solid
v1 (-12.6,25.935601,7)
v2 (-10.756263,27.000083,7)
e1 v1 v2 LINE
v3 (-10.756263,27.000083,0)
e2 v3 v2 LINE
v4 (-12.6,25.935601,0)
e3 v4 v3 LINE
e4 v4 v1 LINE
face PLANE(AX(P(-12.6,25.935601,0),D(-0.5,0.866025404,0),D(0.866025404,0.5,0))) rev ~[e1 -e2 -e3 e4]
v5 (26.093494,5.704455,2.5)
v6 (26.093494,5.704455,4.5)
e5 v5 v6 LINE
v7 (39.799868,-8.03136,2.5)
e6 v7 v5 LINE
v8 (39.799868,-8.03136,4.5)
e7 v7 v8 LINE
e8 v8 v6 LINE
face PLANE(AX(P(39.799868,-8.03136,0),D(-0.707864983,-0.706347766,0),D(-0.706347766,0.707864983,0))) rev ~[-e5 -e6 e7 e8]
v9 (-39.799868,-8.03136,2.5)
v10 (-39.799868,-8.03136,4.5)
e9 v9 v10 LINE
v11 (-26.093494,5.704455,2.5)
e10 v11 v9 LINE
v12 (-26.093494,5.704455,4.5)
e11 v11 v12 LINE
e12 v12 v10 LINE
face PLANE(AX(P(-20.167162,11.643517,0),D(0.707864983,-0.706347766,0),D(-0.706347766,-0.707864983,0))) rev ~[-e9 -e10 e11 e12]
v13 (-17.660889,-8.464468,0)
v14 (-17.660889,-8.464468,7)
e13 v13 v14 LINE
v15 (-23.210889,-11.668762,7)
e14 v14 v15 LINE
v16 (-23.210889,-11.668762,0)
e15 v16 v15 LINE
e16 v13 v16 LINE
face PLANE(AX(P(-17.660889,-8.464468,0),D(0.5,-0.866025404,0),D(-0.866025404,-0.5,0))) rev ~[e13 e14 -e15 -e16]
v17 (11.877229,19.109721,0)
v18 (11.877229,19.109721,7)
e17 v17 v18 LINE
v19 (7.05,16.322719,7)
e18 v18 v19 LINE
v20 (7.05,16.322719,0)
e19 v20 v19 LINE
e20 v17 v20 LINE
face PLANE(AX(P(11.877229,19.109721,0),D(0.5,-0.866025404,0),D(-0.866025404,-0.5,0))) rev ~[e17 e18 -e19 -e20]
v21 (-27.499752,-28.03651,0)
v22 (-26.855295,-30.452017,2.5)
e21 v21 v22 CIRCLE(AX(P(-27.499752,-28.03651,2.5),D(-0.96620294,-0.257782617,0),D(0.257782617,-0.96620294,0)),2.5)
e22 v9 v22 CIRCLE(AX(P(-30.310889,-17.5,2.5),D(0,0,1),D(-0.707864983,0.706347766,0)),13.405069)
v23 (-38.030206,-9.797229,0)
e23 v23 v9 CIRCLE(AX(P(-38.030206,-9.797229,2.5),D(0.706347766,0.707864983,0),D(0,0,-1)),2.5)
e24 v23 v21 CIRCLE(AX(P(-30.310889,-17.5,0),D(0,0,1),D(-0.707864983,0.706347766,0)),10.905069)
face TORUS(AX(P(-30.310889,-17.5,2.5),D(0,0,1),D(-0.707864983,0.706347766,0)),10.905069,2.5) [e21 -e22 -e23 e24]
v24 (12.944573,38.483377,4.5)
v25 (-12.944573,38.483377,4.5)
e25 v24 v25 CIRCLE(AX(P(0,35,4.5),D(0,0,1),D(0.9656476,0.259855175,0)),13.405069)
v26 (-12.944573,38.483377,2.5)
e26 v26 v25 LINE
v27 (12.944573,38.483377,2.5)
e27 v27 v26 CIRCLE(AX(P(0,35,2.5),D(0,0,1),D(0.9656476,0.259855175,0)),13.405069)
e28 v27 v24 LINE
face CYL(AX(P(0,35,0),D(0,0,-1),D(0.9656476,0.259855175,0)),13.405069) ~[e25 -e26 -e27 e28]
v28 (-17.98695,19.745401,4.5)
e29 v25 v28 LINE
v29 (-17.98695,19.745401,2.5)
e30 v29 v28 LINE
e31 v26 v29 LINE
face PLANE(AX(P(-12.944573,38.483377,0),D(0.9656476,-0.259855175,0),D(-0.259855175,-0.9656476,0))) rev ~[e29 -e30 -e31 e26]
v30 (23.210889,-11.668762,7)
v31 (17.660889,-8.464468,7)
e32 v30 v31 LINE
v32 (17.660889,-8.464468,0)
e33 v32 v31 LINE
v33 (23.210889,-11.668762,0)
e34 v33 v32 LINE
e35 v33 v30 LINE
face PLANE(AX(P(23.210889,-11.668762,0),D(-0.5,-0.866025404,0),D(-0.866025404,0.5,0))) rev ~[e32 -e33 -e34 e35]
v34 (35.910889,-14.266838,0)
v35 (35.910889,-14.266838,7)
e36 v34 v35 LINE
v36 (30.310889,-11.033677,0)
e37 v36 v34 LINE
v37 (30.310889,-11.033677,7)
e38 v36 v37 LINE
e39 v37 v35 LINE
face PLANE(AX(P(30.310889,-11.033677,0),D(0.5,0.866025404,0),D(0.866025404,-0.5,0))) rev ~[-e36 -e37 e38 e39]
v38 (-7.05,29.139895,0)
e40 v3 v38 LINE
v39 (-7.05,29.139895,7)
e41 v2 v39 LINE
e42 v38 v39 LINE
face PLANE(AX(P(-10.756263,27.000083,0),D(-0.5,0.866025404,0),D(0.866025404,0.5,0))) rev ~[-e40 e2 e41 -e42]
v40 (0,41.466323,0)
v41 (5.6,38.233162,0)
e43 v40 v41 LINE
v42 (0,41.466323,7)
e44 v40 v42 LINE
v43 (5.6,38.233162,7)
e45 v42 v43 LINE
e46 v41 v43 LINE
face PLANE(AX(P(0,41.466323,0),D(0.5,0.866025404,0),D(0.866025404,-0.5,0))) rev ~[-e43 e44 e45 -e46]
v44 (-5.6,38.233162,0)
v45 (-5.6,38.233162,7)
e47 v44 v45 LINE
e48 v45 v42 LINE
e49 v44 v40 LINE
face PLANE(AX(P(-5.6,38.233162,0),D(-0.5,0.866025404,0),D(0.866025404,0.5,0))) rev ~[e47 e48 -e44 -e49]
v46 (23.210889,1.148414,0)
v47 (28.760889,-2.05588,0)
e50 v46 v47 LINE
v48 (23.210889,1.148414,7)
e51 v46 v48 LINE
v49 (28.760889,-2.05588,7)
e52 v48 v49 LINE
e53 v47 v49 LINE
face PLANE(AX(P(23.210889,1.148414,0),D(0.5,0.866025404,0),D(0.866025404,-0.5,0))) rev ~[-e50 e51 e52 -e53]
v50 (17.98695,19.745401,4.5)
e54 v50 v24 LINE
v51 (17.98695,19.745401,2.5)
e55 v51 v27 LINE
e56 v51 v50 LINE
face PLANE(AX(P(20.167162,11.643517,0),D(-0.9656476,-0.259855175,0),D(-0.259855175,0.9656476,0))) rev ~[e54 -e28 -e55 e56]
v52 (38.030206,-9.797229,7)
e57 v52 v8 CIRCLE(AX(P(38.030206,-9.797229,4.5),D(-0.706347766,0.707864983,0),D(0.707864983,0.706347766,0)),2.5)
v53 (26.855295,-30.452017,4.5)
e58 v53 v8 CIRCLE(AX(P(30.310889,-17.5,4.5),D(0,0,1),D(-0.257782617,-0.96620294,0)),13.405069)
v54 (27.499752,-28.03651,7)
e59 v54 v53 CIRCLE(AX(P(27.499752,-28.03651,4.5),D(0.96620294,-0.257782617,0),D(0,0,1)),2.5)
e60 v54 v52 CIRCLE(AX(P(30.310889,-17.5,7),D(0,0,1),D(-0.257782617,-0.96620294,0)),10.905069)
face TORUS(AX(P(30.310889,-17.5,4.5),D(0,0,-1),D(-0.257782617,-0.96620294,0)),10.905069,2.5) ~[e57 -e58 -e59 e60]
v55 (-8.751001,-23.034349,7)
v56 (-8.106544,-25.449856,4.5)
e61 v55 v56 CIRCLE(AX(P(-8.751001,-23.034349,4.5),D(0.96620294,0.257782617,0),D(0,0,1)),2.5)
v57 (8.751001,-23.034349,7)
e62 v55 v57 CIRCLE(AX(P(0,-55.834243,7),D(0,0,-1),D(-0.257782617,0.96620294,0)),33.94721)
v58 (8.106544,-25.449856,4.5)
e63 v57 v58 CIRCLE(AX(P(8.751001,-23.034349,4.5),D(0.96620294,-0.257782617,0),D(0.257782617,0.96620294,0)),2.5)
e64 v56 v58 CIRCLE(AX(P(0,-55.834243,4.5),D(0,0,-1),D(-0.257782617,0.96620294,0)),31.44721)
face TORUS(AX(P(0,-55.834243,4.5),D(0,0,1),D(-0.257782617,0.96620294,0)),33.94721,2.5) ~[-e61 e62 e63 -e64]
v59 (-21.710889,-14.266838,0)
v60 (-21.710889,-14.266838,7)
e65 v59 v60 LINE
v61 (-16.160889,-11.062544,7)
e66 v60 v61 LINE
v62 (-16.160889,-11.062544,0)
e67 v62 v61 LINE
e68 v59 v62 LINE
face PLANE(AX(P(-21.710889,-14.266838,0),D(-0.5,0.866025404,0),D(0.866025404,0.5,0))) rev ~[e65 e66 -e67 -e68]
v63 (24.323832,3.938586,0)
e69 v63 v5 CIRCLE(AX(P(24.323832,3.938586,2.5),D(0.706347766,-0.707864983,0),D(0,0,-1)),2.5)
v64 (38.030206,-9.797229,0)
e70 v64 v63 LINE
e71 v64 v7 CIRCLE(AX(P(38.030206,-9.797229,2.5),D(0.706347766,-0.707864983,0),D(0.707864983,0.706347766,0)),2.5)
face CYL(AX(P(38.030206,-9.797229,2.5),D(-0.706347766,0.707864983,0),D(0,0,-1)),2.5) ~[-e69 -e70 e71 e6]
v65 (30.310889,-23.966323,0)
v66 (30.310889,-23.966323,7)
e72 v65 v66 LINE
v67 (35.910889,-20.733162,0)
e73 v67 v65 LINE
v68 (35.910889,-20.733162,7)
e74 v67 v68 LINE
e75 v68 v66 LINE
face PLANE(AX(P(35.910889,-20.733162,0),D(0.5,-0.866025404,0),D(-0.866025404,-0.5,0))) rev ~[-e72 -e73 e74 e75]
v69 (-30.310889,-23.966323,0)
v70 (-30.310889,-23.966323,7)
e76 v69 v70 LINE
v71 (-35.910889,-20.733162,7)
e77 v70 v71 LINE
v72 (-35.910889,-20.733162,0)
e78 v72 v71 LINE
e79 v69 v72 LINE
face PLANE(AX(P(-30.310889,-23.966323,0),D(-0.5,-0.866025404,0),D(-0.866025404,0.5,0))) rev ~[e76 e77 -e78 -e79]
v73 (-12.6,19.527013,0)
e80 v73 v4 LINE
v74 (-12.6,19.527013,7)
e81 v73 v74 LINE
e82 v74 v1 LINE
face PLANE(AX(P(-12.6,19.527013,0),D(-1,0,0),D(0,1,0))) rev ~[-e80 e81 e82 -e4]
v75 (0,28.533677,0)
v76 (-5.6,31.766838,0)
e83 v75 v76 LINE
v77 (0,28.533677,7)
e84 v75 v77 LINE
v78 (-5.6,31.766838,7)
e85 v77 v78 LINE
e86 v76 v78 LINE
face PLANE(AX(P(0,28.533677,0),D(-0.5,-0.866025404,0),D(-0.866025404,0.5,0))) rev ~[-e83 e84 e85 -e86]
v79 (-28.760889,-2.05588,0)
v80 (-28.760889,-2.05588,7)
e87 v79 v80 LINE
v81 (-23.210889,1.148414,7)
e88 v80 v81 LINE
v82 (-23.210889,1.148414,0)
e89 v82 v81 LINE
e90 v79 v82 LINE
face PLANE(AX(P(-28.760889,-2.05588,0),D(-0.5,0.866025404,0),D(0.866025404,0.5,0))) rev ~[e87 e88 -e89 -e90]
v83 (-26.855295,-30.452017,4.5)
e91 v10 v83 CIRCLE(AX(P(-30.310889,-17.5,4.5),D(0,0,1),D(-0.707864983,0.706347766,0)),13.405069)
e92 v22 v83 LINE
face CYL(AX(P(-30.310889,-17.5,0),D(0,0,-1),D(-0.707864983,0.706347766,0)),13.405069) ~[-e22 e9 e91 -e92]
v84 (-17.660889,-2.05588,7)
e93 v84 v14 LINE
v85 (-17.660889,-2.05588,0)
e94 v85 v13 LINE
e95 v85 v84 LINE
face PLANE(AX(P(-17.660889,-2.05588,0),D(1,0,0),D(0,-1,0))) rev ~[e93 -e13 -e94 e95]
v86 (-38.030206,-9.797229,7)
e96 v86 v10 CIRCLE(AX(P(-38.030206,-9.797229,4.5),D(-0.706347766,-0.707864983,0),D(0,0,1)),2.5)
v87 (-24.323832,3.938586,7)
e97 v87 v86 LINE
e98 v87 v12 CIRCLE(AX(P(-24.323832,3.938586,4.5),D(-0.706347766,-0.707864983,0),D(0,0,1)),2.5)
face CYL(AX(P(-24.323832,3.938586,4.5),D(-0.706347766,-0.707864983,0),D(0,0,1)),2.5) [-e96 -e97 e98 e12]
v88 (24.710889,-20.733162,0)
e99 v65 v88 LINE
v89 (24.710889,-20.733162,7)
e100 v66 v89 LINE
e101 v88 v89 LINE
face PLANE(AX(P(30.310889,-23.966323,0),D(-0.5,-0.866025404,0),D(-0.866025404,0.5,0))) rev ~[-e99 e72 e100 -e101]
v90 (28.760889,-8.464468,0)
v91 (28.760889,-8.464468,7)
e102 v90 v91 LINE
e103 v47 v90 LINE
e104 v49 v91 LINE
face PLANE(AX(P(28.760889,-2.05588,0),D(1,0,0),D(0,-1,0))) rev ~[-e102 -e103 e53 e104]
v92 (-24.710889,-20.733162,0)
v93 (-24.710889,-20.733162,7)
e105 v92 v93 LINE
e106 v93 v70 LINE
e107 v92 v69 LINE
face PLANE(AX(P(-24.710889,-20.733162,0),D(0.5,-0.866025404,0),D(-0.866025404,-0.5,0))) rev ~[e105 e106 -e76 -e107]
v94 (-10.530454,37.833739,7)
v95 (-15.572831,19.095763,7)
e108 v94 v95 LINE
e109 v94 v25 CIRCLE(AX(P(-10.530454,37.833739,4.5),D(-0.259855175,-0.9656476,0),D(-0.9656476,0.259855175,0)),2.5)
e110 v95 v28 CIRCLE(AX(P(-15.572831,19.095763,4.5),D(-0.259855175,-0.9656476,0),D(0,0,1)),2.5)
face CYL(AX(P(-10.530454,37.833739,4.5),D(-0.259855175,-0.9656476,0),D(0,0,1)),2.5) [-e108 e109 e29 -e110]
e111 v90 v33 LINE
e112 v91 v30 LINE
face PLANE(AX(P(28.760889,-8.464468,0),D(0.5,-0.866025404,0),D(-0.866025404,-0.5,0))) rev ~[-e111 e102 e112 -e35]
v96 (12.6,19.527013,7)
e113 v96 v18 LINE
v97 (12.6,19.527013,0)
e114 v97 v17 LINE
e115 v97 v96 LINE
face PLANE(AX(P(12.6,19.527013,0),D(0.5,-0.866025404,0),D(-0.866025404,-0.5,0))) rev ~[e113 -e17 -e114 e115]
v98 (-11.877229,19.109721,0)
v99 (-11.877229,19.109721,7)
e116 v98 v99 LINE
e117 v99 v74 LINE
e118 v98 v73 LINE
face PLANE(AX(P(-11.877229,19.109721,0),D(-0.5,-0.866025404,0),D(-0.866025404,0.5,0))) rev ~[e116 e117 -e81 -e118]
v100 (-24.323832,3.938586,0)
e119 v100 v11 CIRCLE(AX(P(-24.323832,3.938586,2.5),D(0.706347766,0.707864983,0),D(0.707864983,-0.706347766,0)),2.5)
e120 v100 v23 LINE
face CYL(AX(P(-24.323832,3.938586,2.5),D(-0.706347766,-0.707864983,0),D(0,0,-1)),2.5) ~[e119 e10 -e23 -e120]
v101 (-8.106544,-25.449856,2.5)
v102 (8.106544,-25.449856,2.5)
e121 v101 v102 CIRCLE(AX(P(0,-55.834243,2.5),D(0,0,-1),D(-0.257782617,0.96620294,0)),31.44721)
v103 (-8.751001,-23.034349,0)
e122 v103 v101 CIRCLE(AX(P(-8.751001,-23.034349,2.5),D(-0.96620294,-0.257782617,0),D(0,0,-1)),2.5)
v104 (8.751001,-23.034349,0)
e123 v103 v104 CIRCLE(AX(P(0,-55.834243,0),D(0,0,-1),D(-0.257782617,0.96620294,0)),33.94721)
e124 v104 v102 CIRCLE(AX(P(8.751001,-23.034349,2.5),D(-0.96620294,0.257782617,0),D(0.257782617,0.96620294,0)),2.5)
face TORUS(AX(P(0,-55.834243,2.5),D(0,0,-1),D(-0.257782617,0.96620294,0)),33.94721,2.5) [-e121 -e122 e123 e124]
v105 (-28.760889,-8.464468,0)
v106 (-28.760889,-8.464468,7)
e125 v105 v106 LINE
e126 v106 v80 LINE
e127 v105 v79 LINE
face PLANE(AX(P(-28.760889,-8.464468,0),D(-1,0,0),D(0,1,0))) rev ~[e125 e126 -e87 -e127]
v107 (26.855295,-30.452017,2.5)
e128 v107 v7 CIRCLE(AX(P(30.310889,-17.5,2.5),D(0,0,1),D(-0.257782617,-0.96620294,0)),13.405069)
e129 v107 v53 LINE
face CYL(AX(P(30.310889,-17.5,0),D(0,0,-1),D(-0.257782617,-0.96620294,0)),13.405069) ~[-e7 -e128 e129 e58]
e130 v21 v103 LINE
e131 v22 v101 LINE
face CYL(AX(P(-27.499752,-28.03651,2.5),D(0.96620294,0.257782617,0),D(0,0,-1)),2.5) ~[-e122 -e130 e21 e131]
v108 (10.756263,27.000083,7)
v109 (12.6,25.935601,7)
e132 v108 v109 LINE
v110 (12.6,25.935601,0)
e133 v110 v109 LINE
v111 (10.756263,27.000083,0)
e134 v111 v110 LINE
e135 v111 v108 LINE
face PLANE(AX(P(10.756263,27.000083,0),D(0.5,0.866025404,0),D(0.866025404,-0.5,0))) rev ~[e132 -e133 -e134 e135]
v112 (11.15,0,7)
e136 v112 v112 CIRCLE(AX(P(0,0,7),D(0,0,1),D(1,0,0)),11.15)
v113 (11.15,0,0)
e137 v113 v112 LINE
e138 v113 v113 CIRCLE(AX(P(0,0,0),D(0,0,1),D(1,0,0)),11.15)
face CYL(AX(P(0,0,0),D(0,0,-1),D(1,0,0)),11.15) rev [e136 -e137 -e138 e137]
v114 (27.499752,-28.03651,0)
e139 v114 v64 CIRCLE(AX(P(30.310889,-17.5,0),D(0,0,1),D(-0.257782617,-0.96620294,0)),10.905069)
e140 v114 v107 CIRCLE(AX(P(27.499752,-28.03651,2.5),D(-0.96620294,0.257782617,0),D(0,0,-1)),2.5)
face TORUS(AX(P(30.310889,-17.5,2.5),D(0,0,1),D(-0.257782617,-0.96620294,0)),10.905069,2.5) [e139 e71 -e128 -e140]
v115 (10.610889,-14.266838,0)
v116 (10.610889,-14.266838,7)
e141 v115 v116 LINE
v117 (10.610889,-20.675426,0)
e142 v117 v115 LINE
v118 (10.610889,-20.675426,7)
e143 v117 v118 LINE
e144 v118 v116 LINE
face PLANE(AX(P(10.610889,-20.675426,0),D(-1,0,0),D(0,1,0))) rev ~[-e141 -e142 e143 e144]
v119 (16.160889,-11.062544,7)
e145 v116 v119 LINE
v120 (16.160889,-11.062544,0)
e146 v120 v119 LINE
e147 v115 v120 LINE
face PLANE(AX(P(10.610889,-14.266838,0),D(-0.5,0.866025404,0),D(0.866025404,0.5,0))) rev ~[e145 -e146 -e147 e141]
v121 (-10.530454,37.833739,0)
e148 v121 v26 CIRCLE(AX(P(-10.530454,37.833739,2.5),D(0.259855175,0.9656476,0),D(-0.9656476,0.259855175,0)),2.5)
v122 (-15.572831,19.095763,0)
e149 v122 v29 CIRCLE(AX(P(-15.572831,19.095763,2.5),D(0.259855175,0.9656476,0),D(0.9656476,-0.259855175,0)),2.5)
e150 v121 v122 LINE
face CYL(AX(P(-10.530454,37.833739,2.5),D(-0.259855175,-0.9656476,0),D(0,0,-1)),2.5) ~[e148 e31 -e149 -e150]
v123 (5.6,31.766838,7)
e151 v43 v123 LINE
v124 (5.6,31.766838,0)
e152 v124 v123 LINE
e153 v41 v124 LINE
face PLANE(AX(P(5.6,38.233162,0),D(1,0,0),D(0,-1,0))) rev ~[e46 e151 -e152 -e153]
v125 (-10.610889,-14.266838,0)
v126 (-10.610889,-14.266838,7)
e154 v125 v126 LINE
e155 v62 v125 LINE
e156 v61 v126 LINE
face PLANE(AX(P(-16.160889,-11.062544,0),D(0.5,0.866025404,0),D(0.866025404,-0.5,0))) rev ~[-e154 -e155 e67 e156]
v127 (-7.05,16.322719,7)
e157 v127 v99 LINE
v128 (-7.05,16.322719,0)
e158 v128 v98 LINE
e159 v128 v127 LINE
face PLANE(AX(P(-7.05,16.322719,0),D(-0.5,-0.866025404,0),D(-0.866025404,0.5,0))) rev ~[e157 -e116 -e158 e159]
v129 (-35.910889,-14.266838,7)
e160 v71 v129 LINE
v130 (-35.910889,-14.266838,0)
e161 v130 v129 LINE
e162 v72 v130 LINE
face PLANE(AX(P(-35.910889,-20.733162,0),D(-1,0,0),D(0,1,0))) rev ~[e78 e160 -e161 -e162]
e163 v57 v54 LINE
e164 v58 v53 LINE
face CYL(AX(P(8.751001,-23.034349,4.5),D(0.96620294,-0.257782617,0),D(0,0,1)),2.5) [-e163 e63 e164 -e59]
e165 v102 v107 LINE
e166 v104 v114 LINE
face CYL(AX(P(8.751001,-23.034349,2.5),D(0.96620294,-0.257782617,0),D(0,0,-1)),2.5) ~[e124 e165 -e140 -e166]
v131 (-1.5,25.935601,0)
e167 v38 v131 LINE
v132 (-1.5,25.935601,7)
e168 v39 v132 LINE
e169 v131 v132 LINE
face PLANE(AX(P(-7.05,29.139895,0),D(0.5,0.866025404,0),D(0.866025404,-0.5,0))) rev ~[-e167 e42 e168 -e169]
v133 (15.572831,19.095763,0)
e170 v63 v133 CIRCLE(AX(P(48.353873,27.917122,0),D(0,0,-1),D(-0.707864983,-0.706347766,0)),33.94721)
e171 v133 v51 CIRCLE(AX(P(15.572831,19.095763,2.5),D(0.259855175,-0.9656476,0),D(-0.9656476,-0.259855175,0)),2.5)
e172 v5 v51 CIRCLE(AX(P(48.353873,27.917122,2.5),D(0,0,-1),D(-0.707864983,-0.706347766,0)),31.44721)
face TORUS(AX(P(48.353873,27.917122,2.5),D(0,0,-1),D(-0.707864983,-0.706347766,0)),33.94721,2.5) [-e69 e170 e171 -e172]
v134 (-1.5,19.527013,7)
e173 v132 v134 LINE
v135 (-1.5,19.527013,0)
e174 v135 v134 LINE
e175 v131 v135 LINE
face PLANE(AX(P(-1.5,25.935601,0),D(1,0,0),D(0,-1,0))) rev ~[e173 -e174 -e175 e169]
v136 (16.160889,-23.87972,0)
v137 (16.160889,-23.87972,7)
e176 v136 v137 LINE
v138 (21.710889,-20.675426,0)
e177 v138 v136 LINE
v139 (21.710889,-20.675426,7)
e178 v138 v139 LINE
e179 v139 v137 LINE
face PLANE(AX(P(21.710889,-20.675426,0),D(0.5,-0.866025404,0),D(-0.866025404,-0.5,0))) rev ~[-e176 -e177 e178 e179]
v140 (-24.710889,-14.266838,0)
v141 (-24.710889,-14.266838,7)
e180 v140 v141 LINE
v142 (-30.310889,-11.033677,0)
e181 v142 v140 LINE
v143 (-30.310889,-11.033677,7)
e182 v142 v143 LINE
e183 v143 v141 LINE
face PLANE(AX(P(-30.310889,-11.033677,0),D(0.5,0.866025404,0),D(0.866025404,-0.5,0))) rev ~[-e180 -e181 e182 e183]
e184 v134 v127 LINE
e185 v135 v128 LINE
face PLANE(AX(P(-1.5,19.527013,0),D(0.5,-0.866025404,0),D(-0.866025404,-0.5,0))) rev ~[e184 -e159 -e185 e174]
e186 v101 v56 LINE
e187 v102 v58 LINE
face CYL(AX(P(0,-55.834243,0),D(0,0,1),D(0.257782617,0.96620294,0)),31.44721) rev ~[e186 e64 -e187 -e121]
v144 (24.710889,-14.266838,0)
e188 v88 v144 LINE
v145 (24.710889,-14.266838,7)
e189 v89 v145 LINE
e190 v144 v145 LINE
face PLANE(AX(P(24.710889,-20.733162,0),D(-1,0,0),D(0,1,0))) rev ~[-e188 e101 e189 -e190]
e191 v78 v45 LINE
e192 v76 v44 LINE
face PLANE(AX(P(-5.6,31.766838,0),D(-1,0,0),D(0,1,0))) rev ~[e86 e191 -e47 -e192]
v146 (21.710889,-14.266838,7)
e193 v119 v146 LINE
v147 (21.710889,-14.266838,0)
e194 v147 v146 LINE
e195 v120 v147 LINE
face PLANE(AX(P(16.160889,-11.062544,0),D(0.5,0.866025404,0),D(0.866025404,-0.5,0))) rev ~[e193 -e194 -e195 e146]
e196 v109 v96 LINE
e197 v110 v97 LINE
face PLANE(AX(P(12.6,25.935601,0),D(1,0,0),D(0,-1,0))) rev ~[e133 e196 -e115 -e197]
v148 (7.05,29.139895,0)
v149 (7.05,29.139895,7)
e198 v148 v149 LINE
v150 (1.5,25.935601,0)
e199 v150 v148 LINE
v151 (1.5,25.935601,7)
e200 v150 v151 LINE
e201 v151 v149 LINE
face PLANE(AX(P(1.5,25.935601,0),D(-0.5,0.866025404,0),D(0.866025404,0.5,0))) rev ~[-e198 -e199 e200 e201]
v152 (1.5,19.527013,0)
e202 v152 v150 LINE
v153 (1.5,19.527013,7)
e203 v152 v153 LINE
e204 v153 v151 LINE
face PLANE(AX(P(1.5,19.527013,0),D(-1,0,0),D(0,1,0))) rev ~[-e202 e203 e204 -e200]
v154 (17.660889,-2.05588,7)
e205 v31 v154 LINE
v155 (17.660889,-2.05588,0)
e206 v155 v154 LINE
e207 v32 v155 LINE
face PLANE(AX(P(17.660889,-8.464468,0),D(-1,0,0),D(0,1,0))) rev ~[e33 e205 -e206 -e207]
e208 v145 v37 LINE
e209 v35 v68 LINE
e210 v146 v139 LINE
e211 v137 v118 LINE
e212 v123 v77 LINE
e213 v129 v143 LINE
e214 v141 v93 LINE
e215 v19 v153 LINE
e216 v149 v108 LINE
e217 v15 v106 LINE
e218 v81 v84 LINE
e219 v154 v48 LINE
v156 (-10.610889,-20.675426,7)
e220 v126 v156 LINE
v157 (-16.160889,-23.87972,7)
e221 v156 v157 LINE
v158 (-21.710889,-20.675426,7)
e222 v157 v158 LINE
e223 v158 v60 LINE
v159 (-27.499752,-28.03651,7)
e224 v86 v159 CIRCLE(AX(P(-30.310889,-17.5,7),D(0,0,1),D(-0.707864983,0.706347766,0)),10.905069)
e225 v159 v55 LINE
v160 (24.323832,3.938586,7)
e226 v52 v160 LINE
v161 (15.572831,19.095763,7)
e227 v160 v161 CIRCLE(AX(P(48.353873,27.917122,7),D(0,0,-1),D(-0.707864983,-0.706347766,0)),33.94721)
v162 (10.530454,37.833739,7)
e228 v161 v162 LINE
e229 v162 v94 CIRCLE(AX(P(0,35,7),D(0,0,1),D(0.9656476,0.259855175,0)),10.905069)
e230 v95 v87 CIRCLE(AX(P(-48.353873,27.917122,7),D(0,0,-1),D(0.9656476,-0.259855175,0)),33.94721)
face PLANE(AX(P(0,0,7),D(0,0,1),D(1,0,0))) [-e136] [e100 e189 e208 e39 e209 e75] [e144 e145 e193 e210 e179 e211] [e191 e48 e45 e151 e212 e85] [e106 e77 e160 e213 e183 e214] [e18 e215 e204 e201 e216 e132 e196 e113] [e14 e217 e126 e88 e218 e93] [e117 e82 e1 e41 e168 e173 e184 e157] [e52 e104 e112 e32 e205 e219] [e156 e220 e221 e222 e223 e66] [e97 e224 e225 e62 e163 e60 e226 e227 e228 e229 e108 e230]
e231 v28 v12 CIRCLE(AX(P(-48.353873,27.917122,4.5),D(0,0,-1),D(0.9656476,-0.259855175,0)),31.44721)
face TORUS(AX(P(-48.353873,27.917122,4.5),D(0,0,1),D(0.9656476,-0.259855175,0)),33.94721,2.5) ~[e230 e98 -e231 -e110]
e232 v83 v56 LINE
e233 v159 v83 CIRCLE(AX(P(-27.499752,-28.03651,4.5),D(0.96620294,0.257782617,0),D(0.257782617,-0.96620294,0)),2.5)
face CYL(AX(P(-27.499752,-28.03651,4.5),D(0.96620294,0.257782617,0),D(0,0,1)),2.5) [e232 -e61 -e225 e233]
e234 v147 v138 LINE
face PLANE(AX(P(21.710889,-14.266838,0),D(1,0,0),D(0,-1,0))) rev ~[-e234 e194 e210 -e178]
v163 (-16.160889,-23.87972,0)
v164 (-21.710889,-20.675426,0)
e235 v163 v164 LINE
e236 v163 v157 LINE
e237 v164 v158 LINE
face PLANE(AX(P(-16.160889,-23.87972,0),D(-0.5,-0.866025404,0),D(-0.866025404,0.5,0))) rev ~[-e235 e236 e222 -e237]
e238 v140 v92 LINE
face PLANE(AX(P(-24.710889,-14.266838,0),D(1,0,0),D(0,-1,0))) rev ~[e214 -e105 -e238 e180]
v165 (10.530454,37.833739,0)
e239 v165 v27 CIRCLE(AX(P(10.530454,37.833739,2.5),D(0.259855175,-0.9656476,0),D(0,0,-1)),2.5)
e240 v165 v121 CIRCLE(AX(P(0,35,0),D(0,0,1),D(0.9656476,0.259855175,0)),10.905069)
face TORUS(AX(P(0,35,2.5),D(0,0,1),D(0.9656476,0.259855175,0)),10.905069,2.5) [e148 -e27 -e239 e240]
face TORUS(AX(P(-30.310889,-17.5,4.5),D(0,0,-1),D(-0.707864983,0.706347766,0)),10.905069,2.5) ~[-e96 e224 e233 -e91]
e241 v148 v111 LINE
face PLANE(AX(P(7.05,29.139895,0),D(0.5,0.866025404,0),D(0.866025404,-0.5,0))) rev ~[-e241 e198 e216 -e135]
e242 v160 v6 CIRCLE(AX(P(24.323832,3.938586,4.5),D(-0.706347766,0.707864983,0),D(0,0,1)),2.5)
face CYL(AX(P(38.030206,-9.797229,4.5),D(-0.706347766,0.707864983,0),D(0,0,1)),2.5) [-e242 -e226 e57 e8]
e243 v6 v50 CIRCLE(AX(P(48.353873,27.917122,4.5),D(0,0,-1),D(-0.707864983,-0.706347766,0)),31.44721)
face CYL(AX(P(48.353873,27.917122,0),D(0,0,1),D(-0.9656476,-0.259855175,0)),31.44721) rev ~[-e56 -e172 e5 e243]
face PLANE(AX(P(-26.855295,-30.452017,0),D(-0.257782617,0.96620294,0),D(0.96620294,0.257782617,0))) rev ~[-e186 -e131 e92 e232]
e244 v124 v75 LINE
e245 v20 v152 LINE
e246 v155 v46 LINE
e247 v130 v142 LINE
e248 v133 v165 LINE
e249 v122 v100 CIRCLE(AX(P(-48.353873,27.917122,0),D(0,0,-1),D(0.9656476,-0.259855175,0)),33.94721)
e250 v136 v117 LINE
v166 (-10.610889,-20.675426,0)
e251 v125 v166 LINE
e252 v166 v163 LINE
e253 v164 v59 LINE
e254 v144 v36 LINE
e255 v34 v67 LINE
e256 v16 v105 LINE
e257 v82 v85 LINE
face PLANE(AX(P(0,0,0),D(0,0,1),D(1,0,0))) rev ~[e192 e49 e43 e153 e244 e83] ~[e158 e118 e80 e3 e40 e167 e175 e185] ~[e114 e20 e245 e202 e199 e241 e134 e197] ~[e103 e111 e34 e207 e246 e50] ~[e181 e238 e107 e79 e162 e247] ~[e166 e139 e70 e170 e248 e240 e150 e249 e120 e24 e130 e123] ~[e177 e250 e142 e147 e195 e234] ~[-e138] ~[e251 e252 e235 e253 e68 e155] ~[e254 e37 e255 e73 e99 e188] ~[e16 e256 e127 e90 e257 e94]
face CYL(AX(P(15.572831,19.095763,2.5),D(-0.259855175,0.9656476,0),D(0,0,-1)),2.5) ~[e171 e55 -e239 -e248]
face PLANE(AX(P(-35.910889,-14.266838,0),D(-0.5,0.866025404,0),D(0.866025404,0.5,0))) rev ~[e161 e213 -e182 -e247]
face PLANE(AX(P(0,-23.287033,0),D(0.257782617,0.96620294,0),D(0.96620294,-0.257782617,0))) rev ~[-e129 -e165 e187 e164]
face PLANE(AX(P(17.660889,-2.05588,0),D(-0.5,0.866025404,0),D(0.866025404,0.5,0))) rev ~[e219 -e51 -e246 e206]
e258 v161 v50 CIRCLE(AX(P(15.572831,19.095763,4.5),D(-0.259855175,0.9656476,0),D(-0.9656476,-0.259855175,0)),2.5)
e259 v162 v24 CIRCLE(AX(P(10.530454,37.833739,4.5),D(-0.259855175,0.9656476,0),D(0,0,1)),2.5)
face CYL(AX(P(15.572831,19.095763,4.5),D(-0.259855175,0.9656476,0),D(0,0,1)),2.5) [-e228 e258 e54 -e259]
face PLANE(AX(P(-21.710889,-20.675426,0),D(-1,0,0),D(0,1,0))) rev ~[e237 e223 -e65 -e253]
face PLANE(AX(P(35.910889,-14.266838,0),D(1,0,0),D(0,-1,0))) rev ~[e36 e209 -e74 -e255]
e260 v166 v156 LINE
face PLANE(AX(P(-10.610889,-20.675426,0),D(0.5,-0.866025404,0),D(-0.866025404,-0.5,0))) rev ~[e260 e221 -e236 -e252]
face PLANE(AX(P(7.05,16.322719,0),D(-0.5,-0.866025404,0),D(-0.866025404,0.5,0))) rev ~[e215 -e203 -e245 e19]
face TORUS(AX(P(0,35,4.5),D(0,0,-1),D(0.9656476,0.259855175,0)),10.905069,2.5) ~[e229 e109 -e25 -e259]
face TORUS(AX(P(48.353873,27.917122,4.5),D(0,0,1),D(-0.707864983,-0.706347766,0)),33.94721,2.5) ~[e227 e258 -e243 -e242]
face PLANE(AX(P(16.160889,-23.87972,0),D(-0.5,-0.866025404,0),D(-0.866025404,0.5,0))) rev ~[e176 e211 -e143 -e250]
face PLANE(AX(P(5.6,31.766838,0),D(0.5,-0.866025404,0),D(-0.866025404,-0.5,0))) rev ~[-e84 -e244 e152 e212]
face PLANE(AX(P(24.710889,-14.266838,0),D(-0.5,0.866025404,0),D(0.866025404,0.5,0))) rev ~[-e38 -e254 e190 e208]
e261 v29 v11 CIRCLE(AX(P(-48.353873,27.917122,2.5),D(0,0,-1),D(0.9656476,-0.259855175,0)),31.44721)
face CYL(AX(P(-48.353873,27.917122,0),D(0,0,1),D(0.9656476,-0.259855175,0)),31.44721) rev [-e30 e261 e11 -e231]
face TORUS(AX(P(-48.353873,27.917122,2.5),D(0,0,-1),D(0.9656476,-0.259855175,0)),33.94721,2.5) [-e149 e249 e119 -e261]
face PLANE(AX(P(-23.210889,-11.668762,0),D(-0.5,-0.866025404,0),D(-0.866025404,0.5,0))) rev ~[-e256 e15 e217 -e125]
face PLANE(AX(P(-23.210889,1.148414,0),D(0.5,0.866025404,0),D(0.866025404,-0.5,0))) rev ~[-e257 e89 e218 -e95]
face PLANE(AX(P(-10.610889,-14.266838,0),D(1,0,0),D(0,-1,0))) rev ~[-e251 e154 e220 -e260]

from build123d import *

# Parameters (mm, degrees)
F0_R     = 11.15
F1_DEPTH = 7
F2_R     = 31.4472101729
F3_R     = 2.5


with BuildPart() as f1:
    # F0 (on Top) → F1 (new body)
    with BuildSketch(Plane.XY):
        with BuildLine():
            Line((20.1671623726, 11.6435166246), (12.9445725954, 38.4833765179))
            ThreePointArc((12.9445725954, 38.4833765179), (0, 48.4050688787), (-12.9445725954, 38.4833765179))
            Line((-12.9445725954, 38.4833765179), (-20.1671623726, 11.6435166246))
            Line((-20.1671623726, 11.6435166246), (-39.7998679856, -8.0313595503))
            ThreePointArc((-39.7998679856, -8.0313595503), (-41.9200193209, -24.2025344393), (-26.8552953903, -30.4520169677))
            Line((-26.8552953903, -30.4520169677), (0, -23.2870332492))
            Line((0, -23.2870332492), (26.8552953903, -30.4520169677))
            ThreePointArc((26.8552953903, -30.4520169677), (41.9200193209, -24.2025344393), (39.7998679856, -8.0313595503))
            Line((39.7998679856, -8.0313595503), (20.1671623726, 11.6435166246))
        make_face()
        Polygon((-35.9108891325, -14.2668384925), (-30.3108891325, -11.0336769851), (-24.7108891325, -14.2668384925), (-24.7108891325, -20.7331615075), (-30.3108891325, -23.9663230149), (-35.9108891325, -20.7331615075), align=None, mode=Mode.SUBTRACT)
        Polygon((-16.1608891325, -23.8797204745), (-21.7108891325, -20.6754264805), (-21.7108891325, -14.2668384925), (-16.1608891325, -11.0625444985), (-10.6108891325, -14.2668384925), (-10.6108891325, -20.6754264805), align=None, mode=Mode.SUBTRACT)
        Polygon((-23.2108891325, 1.1484136948), (-17.6608891325, -2.0558802992), (-17.6608891325, -8.4644682872), (-23.2108891325, -11.6687622812), (-28.7608891325, -8.4644682872), (-28.7608891325, -2.0558802992), align=None, mode=Mode.SUBTRACT)
        Polygon((10.6108891325, -20.6754264805), (10.6108891325, -14.2668384925), (16.1608891325, -11.0625444985), (21.7108891325, -14.2668384925), (21.7108891325, -20.6754264805), (16.1608891325, -23.8797204745), align=None, mode=Mode.SUBTRACT)
        Polygon((30.3108891325, -23.9663230149), (24.7108891325, -20.7331615075), (24.7108891325, -14.2668384925), (30.3108891325, -11.0336769851), (35.9108891325, -14.2668384925), (35.9108891325, -20.7331615075), align=None, mode=Mode.SUBTRACT)
        Circle(F0_R, mode=Mode.SUBTRACT)
        Polygon((28.7608891325, -2.0558802992), (28.7608891325, -8.4644682872), (23.2108891325, -11.6687622812), (17.6608891325, -8.4644682872), (17.6608891325, -2.0558802992), (23.2108891325, 1.1484136948), align=None, mode=Mode.SUBTRACT)
        Polygon((-7.05, 29.1398947677), (-1.5, 25.9356007737), (-1.5, 21.6791189615), (-1.5, 19.5270127857), (-7.05, 16.3227187917), (-11.8772290867, 19.1097208044), (-12.6, 19.5270127857), (-12.6, 25.9356007737), (-10.7562631022, 27.000082768), align=None, mode=Mode.SUBTRACT)
        Polygon((10.7562631022, 27.000082768), (12.6, 25.9356007737), (12.6, 19.5270127857), (11.8772290867, 19.1097208044), (7.05, 16.3227187917), (1.5, 19.5270127857), (1.5, 21.6791189615), (1.5, 25.9356007737), (7.05, 29.1398947677), align=None, mode=Mode.SUBTRACT)
        Polygon((0, 41.4663230149), (5.6, 38.2331615075), (5.6, 31.7668384925), (0, 28.5336769851), (-5.6, 31.7668384925), (-5.6, 38.2331615075), align=None, mode=Mode.SUBTRACT)
    extrude(amount=F1_DEPTH)

    # F2
    f2_edges = [f1.edges().sort_by_distance(p)[0] for p in [
        (20.167162, 11.643517, 3.5),
        (-20.167162, 11.643517, 3.5),
        (0, -23.287033, 3.5),
    ]]
    fillet(f2_edges, radius=F2_R)

    # F3
    f3_edges = [f1.edges().sort_by_distance(p)[0] for p in [
        (-32.946681, -1.163452, 7),
        (-21.11979, 12.193517, 0),
    ]]
    fillet(f3_edges, radius=F3_R)


solid = f1.part
